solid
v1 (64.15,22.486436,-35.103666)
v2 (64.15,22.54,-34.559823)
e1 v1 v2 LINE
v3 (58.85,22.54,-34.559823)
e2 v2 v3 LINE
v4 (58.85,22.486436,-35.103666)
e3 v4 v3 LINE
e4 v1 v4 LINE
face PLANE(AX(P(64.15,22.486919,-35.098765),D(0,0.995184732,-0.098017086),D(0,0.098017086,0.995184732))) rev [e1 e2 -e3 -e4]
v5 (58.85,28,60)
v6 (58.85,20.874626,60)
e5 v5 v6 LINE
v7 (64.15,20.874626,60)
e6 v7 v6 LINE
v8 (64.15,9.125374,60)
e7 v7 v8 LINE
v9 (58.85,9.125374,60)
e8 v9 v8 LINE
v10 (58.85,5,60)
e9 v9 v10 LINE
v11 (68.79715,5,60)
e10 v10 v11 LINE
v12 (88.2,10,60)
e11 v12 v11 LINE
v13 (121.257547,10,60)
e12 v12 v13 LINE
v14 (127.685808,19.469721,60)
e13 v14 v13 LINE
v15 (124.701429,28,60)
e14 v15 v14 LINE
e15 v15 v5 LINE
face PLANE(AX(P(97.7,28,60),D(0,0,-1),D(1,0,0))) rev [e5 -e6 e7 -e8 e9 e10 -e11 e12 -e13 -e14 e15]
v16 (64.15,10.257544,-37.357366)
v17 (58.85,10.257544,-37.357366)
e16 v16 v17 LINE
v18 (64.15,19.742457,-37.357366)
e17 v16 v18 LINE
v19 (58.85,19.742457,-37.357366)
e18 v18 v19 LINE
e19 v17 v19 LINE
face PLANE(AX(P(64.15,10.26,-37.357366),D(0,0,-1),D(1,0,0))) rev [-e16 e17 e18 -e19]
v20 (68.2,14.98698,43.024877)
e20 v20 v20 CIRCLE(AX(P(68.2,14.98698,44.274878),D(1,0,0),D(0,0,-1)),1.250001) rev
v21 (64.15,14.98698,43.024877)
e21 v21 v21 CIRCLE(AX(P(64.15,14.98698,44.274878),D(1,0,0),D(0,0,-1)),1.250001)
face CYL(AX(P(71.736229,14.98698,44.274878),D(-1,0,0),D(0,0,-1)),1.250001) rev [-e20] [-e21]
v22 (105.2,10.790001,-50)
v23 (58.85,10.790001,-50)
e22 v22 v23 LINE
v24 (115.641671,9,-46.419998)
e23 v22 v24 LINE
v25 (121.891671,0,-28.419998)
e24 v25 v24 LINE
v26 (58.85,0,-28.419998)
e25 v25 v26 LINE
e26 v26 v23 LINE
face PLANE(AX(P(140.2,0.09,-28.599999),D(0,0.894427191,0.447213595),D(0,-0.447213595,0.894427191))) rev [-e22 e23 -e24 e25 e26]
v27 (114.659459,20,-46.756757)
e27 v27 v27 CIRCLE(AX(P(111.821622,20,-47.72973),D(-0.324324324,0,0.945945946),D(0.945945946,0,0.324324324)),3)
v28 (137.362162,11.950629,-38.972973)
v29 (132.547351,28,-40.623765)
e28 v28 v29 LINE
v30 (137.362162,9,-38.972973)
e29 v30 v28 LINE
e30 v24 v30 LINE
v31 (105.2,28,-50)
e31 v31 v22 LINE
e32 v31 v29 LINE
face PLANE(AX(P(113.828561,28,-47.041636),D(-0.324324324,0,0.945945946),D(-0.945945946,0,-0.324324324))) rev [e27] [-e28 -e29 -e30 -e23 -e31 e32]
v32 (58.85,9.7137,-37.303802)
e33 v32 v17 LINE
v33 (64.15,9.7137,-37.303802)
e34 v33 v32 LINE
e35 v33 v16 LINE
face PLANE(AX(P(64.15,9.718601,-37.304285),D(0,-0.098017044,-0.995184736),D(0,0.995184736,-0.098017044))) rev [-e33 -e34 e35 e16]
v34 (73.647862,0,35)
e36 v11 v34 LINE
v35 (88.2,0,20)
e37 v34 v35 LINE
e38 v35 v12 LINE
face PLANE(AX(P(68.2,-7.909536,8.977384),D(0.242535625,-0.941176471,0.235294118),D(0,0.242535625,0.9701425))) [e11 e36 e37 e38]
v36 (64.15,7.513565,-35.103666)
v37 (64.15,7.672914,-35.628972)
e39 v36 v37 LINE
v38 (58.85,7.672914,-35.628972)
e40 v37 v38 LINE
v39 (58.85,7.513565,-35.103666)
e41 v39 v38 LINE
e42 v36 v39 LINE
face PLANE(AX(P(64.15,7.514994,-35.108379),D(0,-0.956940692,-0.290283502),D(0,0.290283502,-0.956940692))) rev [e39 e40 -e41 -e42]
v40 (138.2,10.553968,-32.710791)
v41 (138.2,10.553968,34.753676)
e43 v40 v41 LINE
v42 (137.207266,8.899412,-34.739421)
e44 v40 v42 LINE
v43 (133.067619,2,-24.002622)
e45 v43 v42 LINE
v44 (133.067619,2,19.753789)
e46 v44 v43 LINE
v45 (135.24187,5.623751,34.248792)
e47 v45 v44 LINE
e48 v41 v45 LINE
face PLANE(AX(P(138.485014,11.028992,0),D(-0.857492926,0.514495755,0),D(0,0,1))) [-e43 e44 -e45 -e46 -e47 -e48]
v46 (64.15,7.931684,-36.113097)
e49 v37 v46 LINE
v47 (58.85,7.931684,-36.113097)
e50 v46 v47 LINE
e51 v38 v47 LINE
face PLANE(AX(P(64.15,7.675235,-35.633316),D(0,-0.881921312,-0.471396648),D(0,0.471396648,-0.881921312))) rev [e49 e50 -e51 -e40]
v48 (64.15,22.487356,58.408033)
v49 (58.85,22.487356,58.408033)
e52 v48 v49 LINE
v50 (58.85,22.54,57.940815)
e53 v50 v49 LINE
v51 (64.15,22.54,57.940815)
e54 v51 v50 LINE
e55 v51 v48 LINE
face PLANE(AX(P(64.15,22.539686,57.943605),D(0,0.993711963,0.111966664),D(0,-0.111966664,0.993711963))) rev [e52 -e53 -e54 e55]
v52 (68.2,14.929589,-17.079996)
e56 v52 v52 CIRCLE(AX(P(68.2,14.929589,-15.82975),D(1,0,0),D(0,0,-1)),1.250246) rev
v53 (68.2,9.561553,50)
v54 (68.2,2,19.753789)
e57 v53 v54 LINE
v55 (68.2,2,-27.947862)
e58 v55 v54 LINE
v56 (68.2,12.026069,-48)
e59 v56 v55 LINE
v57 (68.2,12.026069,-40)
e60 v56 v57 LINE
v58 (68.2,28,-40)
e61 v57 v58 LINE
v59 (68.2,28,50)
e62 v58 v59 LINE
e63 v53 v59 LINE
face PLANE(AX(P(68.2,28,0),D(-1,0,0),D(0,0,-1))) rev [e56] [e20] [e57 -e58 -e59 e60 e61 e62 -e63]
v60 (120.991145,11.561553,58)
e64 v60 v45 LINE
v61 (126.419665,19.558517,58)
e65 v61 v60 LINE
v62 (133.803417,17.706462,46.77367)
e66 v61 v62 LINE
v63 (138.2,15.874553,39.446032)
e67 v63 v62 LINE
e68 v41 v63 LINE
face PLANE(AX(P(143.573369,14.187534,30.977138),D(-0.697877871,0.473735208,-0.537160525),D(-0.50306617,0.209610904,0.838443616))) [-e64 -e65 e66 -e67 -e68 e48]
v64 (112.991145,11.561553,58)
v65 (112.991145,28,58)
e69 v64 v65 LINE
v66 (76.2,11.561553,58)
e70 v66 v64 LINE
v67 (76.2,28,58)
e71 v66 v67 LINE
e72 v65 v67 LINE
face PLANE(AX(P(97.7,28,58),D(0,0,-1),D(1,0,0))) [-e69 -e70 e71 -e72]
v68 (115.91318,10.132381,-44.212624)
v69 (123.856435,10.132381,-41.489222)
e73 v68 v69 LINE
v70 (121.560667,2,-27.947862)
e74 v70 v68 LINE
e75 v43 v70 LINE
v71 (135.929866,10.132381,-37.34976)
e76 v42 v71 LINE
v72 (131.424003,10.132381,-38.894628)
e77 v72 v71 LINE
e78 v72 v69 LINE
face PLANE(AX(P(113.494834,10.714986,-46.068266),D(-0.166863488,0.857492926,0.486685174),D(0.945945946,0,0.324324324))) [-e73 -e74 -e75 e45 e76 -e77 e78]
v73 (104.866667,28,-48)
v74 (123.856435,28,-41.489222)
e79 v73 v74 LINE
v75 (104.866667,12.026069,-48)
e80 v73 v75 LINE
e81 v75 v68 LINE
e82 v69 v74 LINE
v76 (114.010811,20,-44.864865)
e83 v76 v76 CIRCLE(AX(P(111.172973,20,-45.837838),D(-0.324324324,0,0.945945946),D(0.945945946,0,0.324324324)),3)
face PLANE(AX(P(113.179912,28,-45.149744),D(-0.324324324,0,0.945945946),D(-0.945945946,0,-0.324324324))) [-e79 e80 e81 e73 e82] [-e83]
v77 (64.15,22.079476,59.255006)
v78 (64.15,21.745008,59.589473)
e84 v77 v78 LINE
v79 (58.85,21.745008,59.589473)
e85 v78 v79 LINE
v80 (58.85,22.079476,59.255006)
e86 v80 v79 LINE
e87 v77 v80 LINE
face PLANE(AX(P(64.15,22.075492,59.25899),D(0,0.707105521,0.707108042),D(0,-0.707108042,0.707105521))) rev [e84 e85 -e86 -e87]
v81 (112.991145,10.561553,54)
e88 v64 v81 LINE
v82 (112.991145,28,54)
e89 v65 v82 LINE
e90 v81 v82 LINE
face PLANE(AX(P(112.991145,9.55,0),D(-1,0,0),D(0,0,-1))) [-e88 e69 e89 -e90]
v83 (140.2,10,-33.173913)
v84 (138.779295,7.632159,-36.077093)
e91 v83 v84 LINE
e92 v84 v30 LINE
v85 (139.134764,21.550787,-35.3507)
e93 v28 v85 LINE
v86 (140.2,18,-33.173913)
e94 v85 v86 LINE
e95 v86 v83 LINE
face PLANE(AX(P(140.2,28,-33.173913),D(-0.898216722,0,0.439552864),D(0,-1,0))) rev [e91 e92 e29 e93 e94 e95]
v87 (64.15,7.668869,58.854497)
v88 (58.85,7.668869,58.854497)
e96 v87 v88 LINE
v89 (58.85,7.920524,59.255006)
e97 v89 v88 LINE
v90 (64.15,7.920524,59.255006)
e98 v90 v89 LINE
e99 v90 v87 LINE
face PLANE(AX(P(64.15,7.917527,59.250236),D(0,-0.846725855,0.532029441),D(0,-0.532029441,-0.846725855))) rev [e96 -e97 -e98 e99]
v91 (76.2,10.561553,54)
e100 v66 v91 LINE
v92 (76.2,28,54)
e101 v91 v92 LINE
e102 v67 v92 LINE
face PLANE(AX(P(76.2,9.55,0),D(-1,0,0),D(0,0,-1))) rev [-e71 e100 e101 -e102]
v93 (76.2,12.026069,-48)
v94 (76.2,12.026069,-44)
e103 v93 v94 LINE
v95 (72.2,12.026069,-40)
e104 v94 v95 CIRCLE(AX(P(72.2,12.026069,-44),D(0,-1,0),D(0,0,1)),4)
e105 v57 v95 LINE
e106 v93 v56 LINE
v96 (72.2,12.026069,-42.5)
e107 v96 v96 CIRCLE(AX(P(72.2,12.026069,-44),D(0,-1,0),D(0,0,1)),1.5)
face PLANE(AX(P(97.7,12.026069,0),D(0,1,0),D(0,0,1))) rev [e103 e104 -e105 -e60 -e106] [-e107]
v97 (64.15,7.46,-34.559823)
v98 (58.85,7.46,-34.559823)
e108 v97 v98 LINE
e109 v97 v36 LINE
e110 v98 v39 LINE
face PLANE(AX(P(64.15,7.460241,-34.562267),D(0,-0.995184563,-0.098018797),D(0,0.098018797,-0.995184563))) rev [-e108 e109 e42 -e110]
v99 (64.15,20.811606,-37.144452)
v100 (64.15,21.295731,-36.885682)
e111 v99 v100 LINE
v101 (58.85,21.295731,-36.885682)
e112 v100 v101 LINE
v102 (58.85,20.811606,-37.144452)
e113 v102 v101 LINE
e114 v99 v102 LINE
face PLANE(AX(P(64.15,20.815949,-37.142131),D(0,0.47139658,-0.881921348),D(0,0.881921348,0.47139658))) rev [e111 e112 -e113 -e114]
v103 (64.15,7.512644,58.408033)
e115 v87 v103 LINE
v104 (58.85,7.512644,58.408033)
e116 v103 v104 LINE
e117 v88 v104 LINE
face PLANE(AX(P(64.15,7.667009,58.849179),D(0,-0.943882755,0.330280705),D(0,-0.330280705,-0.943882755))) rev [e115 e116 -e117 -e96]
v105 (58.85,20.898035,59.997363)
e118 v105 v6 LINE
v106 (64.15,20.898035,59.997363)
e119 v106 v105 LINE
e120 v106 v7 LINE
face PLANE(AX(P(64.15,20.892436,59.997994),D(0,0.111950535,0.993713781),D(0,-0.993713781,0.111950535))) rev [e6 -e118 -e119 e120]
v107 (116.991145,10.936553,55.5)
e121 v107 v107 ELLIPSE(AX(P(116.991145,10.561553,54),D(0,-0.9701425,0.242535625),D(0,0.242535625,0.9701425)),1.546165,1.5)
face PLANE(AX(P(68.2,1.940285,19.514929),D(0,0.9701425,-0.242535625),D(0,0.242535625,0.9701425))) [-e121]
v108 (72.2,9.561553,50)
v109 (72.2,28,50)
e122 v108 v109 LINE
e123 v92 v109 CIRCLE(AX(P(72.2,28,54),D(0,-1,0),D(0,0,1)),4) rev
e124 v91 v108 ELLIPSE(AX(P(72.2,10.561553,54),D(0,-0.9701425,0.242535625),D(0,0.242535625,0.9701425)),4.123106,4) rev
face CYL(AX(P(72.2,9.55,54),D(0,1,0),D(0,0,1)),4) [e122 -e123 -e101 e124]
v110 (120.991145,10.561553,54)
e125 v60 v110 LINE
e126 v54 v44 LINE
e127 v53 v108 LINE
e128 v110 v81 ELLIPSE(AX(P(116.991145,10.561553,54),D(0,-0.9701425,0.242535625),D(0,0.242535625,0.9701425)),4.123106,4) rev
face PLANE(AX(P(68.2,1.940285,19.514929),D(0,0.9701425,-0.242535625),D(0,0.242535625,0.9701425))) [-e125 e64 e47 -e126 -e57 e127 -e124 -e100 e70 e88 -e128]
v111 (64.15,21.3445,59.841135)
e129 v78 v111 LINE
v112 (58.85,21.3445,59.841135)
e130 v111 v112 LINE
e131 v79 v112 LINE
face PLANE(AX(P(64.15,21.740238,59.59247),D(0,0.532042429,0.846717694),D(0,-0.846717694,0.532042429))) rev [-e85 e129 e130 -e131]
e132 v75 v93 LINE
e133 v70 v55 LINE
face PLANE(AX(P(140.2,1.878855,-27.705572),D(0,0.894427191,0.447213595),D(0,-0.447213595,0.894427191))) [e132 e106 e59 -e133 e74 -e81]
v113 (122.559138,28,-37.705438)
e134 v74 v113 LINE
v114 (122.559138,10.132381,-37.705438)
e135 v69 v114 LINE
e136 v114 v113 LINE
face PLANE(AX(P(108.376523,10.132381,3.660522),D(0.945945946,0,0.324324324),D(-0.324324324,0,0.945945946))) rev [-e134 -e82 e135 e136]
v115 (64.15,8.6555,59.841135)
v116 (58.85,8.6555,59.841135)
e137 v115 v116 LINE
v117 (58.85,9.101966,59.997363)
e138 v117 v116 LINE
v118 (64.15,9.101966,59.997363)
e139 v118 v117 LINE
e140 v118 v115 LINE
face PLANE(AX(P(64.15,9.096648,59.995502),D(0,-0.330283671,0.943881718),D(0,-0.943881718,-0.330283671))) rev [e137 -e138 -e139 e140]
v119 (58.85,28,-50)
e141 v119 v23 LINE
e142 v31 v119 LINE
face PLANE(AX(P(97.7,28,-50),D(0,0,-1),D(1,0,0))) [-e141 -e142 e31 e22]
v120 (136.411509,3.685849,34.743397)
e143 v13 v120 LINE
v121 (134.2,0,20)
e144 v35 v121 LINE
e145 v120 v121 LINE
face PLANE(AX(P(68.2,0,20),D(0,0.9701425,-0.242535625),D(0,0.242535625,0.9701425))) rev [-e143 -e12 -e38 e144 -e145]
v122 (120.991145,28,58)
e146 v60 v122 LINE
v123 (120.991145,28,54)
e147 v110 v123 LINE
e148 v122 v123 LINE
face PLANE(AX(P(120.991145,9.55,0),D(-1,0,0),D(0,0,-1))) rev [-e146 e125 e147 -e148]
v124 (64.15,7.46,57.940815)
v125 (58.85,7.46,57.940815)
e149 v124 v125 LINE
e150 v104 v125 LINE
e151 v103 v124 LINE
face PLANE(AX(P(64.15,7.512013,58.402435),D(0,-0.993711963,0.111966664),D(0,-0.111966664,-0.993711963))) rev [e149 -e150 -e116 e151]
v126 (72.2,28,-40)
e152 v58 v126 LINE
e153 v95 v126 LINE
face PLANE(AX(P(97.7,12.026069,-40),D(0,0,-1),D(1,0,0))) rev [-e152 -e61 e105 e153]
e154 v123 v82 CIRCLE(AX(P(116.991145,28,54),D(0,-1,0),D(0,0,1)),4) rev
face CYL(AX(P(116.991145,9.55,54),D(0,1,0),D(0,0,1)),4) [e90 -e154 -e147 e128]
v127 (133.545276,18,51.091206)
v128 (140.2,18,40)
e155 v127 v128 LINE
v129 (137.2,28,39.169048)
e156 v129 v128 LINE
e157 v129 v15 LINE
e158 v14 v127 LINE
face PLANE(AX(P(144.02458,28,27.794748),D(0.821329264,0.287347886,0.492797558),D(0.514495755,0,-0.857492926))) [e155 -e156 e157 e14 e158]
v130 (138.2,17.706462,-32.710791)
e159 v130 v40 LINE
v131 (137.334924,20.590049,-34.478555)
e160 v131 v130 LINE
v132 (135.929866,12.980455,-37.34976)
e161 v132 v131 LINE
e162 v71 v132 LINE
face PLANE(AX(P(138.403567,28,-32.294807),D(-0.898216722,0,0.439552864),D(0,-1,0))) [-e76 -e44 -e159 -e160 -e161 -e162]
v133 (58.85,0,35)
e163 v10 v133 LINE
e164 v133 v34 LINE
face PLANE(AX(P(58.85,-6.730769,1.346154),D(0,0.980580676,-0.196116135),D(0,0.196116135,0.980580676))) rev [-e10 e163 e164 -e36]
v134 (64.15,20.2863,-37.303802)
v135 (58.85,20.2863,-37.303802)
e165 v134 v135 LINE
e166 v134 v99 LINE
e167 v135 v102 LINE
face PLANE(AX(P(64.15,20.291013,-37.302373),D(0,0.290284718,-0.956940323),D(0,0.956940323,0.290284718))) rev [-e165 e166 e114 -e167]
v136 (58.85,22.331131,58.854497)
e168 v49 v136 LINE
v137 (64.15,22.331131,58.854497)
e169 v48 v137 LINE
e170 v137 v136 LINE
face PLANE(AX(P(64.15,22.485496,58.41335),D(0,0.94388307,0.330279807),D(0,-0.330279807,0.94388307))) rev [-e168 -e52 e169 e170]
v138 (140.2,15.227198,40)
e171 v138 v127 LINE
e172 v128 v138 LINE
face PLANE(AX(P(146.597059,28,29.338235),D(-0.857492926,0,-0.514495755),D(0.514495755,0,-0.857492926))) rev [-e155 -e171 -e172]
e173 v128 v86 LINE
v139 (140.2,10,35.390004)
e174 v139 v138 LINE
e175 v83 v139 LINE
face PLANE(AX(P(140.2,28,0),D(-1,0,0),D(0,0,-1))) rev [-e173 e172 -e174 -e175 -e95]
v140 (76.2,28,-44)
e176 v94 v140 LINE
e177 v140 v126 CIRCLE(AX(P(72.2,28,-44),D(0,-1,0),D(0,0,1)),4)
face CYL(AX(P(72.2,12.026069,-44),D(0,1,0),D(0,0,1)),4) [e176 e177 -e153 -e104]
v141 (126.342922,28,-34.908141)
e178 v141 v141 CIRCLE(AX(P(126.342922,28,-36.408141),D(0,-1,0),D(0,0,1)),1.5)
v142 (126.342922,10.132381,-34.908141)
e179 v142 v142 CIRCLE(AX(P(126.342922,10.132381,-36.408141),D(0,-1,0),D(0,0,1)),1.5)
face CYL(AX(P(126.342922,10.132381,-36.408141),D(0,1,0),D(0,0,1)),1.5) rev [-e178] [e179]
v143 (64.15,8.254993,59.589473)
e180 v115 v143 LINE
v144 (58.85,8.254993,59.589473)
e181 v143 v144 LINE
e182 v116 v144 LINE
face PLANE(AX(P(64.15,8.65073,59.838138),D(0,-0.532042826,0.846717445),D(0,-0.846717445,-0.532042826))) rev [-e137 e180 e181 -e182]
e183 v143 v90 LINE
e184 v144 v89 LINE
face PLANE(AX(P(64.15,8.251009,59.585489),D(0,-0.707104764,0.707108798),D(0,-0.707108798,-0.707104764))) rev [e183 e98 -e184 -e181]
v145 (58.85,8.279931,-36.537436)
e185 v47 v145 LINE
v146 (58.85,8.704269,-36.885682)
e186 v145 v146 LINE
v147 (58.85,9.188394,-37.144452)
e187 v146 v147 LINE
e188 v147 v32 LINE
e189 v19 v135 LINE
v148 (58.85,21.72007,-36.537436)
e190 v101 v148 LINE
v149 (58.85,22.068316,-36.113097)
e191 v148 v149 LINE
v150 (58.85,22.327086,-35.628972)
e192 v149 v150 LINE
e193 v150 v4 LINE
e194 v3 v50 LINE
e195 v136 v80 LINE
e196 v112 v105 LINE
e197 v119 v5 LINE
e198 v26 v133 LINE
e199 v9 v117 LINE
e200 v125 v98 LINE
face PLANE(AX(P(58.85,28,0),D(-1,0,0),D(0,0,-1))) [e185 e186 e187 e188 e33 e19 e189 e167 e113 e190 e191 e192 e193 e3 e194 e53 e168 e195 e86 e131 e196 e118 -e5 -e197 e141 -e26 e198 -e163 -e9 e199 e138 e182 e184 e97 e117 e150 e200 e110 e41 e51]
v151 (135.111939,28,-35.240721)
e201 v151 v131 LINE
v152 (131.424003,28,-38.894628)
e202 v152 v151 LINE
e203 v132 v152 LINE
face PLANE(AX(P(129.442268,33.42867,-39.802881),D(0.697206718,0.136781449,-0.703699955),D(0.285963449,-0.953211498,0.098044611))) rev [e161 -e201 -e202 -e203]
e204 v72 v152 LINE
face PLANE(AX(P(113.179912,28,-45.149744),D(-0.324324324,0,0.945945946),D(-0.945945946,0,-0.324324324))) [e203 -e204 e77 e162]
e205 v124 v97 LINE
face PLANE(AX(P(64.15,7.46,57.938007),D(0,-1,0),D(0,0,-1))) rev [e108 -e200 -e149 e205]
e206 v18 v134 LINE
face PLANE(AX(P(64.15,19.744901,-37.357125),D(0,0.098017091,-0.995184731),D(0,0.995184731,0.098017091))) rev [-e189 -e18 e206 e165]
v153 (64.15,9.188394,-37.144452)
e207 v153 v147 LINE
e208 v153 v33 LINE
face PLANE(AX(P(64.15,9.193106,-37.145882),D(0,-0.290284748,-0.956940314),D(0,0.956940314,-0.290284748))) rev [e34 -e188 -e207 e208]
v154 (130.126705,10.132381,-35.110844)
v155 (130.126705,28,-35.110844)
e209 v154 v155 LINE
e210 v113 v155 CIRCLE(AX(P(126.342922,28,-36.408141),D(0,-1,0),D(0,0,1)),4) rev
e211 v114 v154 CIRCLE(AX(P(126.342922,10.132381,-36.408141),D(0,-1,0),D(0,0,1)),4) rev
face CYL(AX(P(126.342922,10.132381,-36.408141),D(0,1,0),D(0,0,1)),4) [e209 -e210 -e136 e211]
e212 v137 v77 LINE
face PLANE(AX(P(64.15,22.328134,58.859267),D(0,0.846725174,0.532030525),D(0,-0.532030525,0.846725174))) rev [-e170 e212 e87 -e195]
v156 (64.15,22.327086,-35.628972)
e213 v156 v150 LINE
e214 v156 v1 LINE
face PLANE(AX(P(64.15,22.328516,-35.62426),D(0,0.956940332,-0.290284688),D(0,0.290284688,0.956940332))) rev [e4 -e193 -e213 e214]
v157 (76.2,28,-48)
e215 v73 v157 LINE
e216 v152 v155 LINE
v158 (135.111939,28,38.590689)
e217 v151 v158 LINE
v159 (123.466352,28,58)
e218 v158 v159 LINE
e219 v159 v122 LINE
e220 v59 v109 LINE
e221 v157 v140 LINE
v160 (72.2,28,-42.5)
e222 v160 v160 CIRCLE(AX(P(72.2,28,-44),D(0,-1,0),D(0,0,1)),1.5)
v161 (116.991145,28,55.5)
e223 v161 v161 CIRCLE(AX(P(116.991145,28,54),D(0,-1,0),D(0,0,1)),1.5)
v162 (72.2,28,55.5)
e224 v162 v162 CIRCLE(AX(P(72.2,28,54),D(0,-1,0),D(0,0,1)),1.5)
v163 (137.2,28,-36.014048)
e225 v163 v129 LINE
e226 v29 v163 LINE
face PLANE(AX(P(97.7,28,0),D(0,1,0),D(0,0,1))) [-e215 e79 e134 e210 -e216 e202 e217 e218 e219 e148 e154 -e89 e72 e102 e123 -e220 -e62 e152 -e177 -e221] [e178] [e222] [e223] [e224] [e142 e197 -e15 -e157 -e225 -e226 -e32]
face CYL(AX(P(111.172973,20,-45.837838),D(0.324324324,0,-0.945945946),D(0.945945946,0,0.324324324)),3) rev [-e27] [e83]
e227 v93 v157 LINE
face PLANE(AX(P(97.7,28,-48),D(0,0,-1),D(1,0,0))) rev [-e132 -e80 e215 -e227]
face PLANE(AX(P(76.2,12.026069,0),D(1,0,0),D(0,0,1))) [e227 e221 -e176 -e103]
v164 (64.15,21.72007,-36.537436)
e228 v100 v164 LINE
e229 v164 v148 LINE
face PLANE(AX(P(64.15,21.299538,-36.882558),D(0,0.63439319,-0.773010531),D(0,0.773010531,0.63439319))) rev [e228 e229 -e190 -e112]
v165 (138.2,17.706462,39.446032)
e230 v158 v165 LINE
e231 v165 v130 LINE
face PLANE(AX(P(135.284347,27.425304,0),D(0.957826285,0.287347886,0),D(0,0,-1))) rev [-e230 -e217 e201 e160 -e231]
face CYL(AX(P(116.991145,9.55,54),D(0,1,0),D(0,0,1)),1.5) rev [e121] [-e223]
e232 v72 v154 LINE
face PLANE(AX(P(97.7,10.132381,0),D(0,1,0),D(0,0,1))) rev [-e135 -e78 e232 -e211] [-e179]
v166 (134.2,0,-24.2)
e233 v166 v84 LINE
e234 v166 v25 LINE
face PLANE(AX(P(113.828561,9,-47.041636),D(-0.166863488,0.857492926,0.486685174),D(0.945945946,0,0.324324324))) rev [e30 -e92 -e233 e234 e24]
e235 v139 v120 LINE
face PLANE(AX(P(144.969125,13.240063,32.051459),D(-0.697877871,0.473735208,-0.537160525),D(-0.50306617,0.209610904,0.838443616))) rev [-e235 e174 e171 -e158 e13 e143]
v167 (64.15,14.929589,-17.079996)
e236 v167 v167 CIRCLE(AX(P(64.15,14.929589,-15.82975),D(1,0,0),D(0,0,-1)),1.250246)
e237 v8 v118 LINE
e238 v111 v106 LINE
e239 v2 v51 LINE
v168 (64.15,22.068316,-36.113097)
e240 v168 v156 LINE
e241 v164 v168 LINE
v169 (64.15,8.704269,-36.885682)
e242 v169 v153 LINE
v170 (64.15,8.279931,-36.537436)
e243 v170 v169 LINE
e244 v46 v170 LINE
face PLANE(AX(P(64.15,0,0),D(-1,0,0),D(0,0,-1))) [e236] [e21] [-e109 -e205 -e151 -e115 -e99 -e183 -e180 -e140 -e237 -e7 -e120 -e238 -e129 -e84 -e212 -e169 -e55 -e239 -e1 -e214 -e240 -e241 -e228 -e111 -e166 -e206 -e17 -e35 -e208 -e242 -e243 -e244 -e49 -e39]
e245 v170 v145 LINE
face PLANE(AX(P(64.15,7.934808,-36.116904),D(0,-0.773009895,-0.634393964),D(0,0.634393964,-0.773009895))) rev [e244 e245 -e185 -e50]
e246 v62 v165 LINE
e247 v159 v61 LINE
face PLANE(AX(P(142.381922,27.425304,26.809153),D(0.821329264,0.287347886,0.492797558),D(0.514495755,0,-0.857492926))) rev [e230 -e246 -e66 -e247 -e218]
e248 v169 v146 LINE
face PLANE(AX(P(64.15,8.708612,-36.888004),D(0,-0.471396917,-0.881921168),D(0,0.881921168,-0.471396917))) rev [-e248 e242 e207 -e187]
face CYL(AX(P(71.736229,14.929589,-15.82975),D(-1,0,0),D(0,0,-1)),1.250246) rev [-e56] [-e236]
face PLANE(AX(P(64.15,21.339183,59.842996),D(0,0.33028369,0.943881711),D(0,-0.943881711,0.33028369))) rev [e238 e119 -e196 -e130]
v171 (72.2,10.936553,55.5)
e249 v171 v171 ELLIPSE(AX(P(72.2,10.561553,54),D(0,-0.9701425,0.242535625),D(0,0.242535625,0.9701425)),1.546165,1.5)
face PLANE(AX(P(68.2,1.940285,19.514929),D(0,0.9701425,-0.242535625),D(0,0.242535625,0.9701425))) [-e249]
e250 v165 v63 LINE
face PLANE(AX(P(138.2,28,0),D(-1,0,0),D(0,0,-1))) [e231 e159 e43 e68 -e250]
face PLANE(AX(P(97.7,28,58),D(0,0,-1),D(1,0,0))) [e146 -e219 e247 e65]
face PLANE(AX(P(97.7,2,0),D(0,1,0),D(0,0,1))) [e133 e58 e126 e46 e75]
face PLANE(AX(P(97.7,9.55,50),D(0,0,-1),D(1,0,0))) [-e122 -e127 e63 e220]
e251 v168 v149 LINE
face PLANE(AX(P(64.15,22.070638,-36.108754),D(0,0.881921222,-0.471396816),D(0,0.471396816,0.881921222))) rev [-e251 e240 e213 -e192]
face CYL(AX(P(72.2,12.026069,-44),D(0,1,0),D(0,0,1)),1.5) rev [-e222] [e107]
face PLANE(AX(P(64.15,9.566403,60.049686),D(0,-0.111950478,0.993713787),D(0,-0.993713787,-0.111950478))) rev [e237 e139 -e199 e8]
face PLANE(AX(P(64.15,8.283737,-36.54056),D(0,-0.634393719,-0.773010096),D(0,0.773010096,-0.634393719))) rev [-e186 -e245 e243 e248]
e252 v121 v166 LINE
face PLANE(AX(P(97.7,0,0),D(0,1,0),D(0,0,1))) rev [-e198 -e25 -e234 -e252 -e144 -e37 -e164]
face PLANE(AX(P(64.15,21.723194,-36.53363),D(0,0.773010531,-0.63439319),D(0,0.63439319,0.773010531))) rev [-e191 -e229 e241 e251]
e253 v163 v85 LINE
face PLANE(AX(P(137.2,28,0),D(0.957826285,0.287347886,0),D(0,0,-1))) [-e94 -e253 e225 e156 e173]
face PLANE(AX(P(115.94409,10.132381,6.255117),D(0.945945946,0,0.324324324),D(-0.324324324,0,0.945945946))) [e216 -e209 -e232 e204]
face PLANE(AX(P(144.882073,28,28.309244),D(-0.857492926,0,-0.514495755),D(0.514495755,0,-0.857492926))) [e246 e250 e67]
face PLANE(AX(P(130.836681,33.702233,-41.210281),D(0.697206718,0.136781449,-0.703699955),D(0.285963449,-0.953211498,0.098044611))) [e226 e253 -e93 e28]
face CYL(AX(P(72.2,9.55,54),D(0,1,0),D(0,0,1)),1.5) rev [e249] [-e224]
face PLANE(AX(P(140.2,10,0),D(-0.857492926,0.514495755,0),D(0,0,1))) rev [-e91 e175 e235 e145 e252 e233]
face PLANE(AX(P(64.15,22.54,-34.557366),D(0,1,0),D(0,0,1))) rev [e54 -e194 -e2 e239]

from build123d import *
from OCP.BRepFilletAPI import BRepFilletAPI_MakeChamfer

# Parameters (mm, degrees)
SKETCH1_W               = 55
SKETCH1_H               = 60
BOSS_EXTRUDE1_DEPTH     = 28
CHAMFER5_SIZE           = 15
CHAMFER5_SIZE2          = 9
CUT_EXTRUDE3_DEPTH      = 98.816154085
CUT_EXTRUDE5_DEPTH      = 98.816154085
CHAMFER2_SIZE           = 6
CHAMFER2_SIZE2          = 10
CHAMFER2_PART_2_SIZE    = 6
CHAMFER2_PART_2_SIZE2   = 10
CHAMFER3_SIZE           = 10
CHAMFER3_SIZE2          = 3
CHAMFER8_SIZE           = 3
CHAMFER8_SIZE2          = 4.688384964
CHAMFER8_SIZE2_2        = 4.826086957
SHELL1_T                = -2
SKETCH1_3_W             = 9.35
SKETCH1_3_H             = 100
SKETCH1_3_H_2           = 10
BOSS_EXTRUDE2_DEPTH     = 28
CUT_EXTRUDE1_DEPTH      = 5.3
CUT_EXTRUDE_THIN1_DEPTH = 5.3
SKETCH4_R               = 1.250001298
SKETCH4_R_2             = 1.250245712
CUT_EXTRUDE2_DEPTH      = 4.05
CUT_EXTRUDE4_DEPTH      = 9.35
CUT_EXTRUDE6_DEPTH      = 98.816154085
CHAMFER6_SIZE           = 20
CHAMFER6_SIZE_2         = 5
SKETCH10_R              = 3
CUT_EXTRUDE7_DEPTH      = 2
SKETCH12_R              = 1.5
BOSS_EXTRUDE3_DEPTH     = 18.45
SKETCH12_4_R            = 1.5
BOSS_EXTRUDE4_DEPTH     = 15.973931
SKETCH12_5_R            = 1.5
BOSS_EXTRUDE5_DEPTH     = 17.86762


with BuildPart() as part:
    # Sketch1 → Boss-Extrude1 (new body)
    # profile 1 of 2: a face of its own
    with BuildSketch(Plane(origin=(0, 0, 0), x_dir=(1, 0, 0), z_dir=(0, 1, 0))):
        Polygon((29.5, 50), (-7.5, 50), (-42.5, 38), (-42.5, -40), (-30.5, -60), (29.5, -60), (29.5, -50), align=None)
        Rectangle(SKETCH1_W, SKETCH1_H, mode=Mode.SUBTRACT)
    # profile 2 of 2: a face of its own
    with BuildSketch(Plane(origin=(0, 0, 0), x_dir=(1, 0, 0), z_dir=(0, 1, 0))):
        Rectangle(SKETCH1_W, SKETCH1_H)
    extrude(amount=BOSS_EXTRUDE1_DEPTH)

    # Chamfer5
    chamfer5_edges = [part.edges().sort_by_distance(p)[0] for p in [
        (-25, 0, -44),
    ]]
    chamfer5_side = [part.faces().sort_by_distance(p)[0] for p in [
        (-5.320816864, 0, 5.646903821),
    ]]
    chamfer(chamfer5_edges, length=CHAMFER5_SIZE, length2=CHAMFER5_SIZE2, reference=chamfer5_side[0])

    # Sketch6 → Cut-Extrude3 (cut, through all)
    with BuildSketch(Plane(origin=(29.5, 0, 0), x_dir=(0, 0, -1), z_dir=(1, 0, 0))):
        Polygon((28.599998808, 0.090000199), (38.599998808, 5.090000199), (50, 10.790000795), (50, 0), (28.41999841, 0), align=None)
    extrude(amount=-CUT_EXTRUDE3_DEPTH, mode=Mode.SUBTRACT)

    # Sketch8 → Cut-Extrude5 (cut, through all)
    with BuildSketch(Plane.ZY.offset(42.5)):
        Polygon((20, 0), (60, 10), (60, 0), align=None)
    extrude(amount=-CUT_EXTRUDE5_DEPTH, mode=Mode.SUBTRACT)

    # Chamfer2
    chamfer2_edges = [part.edges().sort_by_distance(p)[0] for p in [
        (-42.5, 0, -1.071428571),
    ]]
    chamfer2_side = [part.faces().sort_by_distance(p)[0] for p in [
        (-5.998960327, 0, -3.839335876),
    ]]
    chamfer(chamfer2_edges, length=CHAMFER2_SIZE, length2=CHAMFER2_SIZE2, reference=chamfer2_side[0])

    # Chamfer2 part 2
    chamfer2_part_2_edges = [part.edges().sort_by_distance(p)[0] for p in [
        (-36.5, 7.5, 50),
    ]]
    chamfer2_part_2_side = [part.faces().sort_by_distance(p)[0] for p in [
        (-5.108695652, 4.855072464, 39.420289855),
    ]]
    chamfer(chamfer2_part_2_edges, length=CHAMFER2_PART_2_SIZE, length2=CHAMFER2_PART_2_SIZE2, reference=chamfer2_part_2_side[0])

    # Chamfer3: one chamfer whose edges measure the first distance from different faces: ONE call of the kernel's chamfer builder (chamfer() names one face for all edges)
    chamfer3_edges_1 = [part.edges().sort_by_distance(p)[0] for p in [
        (-36.5, 28, 50),
    ]]
    chamfer3_side_1 = [part.faces().sort_by_distance(p)[0] for p in [
        (-36.986722145, 22.762198781, 49.188796426),
    ]]
    chamfer3_edges_2 = [part.edges().sort_by_distance(p)[0] for p in [
        (-42.5, 28, 1),
    ]]
    chamfer3_side_2 = [part.faces().sort_by_distance(p)[0] for p in [
        (-42.5, 19.062821539, 0.675718674),
    ]]
    chamfer3 = BRepFilletAPI_MakeChamfer(part.part.solid().wrapped)
    for e in chamfer3_edges_1:
        chamfer3.Add(CHAMFER3_SIZE, CHAMFER3_SIZE2, e.wrapped, chamfer3_side_1[0].wrapped)  # the first distance lies on this face
    for e in chamfer3_edges_2:
        chamfer3.Add(CHAMFER3_SIZE, CHAMFER3_SIZE2, e.wrapped, chamfer3_side_2[0].wrapped)  # the first distance lies on this face
    add(Compound.cast(chamfer3.Shape()), mode=Mode.REPLACE)

    # Chamfer8: one chamfer whose edges measure the first distance from different faces: ONE call of the kernel's chamfer builder (chamfer() names one face for all edges)
    chamfer8_edges_1 = [part.edges().sort_by_distance(p)[0] for p in [
        (-41, 23, -38.514285714),
    ]]
    chamfer8_side_1 = [part.faces().sort_by_distance(p)[0] for p in [
        (-40.999367405, 23.002108649, 0.534923115),
    ]]
    chamfer8_edges_2 = [part.edges().sort_by_distance(p)[0] for p in [
        (-42.5, 14, -38),
    ]]
    chamfer8_side_2 = [part.faces().sort_by_distance(p)[0] for p in [
        (-24.809989525, 18.489778037, -44.065146449),
    ]]
    chamfer8 = BRepFilletAPI_MakeChamfer(part.part.solid().wrapped)
    for e in chamfer8_edges_1:
        chamfer8.Add(CHAMFER8_SIZE, CHAMFER8_SIZE2, e.wrapped, chamfer8_side_1[0].wrapped)  # the first distance lies on this face
    for e in chamfer8_edges_2:
        chamfer8.Add(CHAMFER8_SIZE, CHAMFER8_SIZE2_2, e.wrapped, chamfer8_side_2[0].wrapped)  # the first distance lies on this face
    add(Compound.cast(chamfer8.Shape()), mode=Mode.REPLACE)

    # Shell1
    shell1_openings = [part.faces().sort_by_distance(p)[0] for p in [
        (-3.850715667, 28, 5.420818652),
        (29.5, 15.210219058, 3.998585691),
    ]]
    offset(amount=SHELL1_T, openings=shell1_openings, kind=Kind.INTERSECTION)

    # Sketch1<3> → Boss-Extrude2 (add)
    with BuildSketch(Plane(origin=(0, 0, 0), x_dir=(1, 0, 0), z_dir=(0, 1, 0))):
        with Locations((34.175, 0)):
            Rectangle(SKETCH1_3_W, SKETCH1_3_H)
        with Locations((34.175, -55)):
            Rectangle(SKETCH1_3_W, SKETCH1_3_H_2)
    extrude(amount=BOSS_EXTRUDE2_DEPTH)

    # Sketch3 → Cut-Extrude1 (cut)
    with BuildSketch(Plane(origin=(38.85, 0, 0), x_dir=(0, 0, -1), z_dir=(1, 0, 0))):
        Polygon((34.557366217, 22.490000211), (-57.938007116, 22.490000211), (-58.396836221, 22.438301563), (-58.832665384, 22.285797958), (-59.223634601, 22.040136716), (-59.550133944, 21.713636209), (-59.795801938, 21.322668447), (-59.948307872, 20.886838382), (-60, 20.4280002), (-60, 9.572000334), (-59.948307872, 9.113161916), (-59.795801938, 8.677331822), (-59.550133944, 8.286364468), (-59.223634601, 7.959863262), (-58.832665384, 7.714202719), (-58.396836221, 7.561698647), (-57.938007116, 7.51), (34.557366217, 7.51), (35.093864598, 7.56284138), (35.609745709, 7.719331512), (36.08518437, 7.973458709), (36.501909895, 8.315457123), (36.84390761, 8.732182065), (37.098034807, 9.207620377), (37.254525637, 9.723501371), (37.307366086, 10.259999985), (37.307366086, 19.740000226), (37.254525637, 20.276498578), (37.098034807, 20.79237963), (36.84390761, 21.267818379), (36.501909895, 21.684543903), (36.08518437, 22.026541618), (35.609745709, 22.280668931), (35.093864598, 22.437159762), align=None)
    extrude(amount=-CUT_EXTRUDE1_DEPTH, mode=Mode.SUBTRACT)

    # Sketch3<2> → Cut-Extrude-Thin1 (cut)
    with BuildSketch(Plane(origin=(38.85, 0, 0), x_dir=(0, 0, -1), z_dir=(1, 0, 0))):
        Polygon((-58.408032741, 22.487356385), (-58.854496816, 22.331131453), (-59.255006355, 22.079475653), (-59.589472678, 21.745008138), (-59.84113526, 21.344500303), (-59.997362817, 20.898034618), (-60.05, 20.430807788), (-60.05, 9.569192748), (-59.997362818, 9.101965682), (-59.841135257, 8.655499956), (-59.589472684, 8.254992553), (-59.255006355, 7.920524316), (-58.854496805, 7.668869226), (-58.408032765, 7.512643829), (-57.940815111, 7.46), (34.559822602, 7.46), (35.103666322, 7.513564845), (35.628972433, 7.672914008), (36.113097308, 7.931684081), (36.537436306, 8.279930722), (36.885682237, 8.704269129), (37.144452294, 9.188393617), (37.303802182, 9.713699658), (37.357366086, 10.257543645), (37.357366086, 19.742456567), (37.303802182, 20.286300291), (37.144452297, 20.811606381), (36.885682251, 21.295731292), (36.537436304, 21.720070312), (36.113097289, 22.068316255), (35.628972465, 22.32708642), (35.103666311, 22.486436306), (34.559822559, 22.540000211), (-57.940815111, 22.540000211), align=None)
        Polygon((-58.396836221, 22.438301563), (-58.832665384, 22.285797958), (-59.223634601, 22.040136716), (-59.550133944, 21.713636209), (-59.795801938, 21.322668447), (-59.948307872, 20.886838382), (-60, 20.4280002), (-60, 9.572000334), (-59.948307872, 9.113161916), (-59.795801938, 8.677331822), (-59.550133944, 8.286364468), (-59.223634601, 7.959863262), (-58.832665384, 7.714202719), (-58.396836221, 7.561698647), (-57.938007116, 7.51), (34.557366217, 7.51), (35.093864598, 7.56284138), (35.609745709, 7.719331512), (36.08518437, 7.973458709), (36.501909895, 8.315457123), (36.84390761, 8.732182065), (37.098034807, 9.207620377), (37.254525637, 9.723501371), (37.307366086, 10.259999985), (37.307366086, 19.740000226), (37.254525637, 20.276498578), (37.098034807, 20.79237963), (36.84390761, 21.267818379), (36.501909895, 21.684543903), (36.08518437, 22.026541618), (35.609745709, 22.280668931), (35.093864598, 22.437159762), (34.557366217, 22.490000211), (-57.938007116, 22.490000211), align=None, mode=Mode.SUBTRACT)
    extrude(amount=-CUT_EXTRUDE_THIN1_DEPTH, mode=Mode.SUBTRACT)

    # Sketch4 → Cut-Extrude2 (cut)
    with BuildSketch(Plane(origin=(33.55, 0, 0), x_dir=(0, 0, -1), z_dir=(1, 0, 0))):
        with Locations((-44.274877957, 14.986979658)):
            Circle(SKETCH4_R)
        with Locations((15.829750418, 14.92958888)):
            Circle(SKETCH4_R_2)
    extrude(amount=-CUT_EXTRUDE2_DEPTH, mode=Mode.SUBTRACT)

    # Sketch7 → Cut-Extrude4 (cut)
    with BuildSketch(Plane.ZY.offset(-29.5)):
        Polygon((-28.41999841, 0), (-50, 10.790000795), (-50, 0), align=None)
    extrude(amount=-CUT_EXTRUDE4_DEPTH, mode=Mode.SUBTRACT)

    # Sketch9 → Cut-Extrude6 (cut, through all)
    with BuildSketch(Plane.ZY.offset(-29.5)):
        Polygon((60, 0), (60, 5), (35, 0), align=None)
    extrude(amount=-CUT_EXTRUDE6_DEPTH, mode=Mode.SUBTRACT)

    # Chamfer6
    # the kernel refuses this chamfer: 20, 5 mm, written as the material it adds along each edge
    with BuildSketch(Plane(origin=(29.5, -12.597918829, -30.391675317), x_dir=(-0.9999563942249224, 0.009059783074481399, -0.0022649457686203496), z_dir=(0, 0.24253562503633297, 0.9701425001453319))) as chamfer6_piece_1_section:
        Polygon((CHAMFER6_SIZE * 0.999956394225, CHAMFER6_SIZE * 0.00933861064032), (-CHAMFER6_SIZE_2 * 0.00933861064032, CHAMFER6_SIZE_2 * 0.999956394225), (0, 0), align=None)
    chamfer6_piece_1 = extrude(amount=145.116156247, mode=Mode.PRIVATE)
    chamfer6_piece_1 = split(chamfer6_piece_1, bisect_by=Plane(origin=(21.891274925, 0, 42.504406507), z_dir=(0, 1, 0)), keep=Keep.TOP, mode=Mode.PRIVATE)
    chamfer6_piece_1 = split(chamfer6_piece_1, bisect_by=Plane(origin=(21.891274925, 4.42094487, 60), z_dir=(0, 0, -1)), keep=Keep.TOP, mode=Mode.PRIVATE)
    chamfer6_piece_1 = split(chamfer6_piece_1, bisect_by=Plane(origin=(21.891274925, 1.613191439, 43.065957193), z_dir=(0, 0.9805806756909202, -0.19611613513818396)), keep=Keep.TOP, mode=Mode.PRIVATE)
    add(chamfer6_piece_1)

    # Sketch10 → Cut-Extrude7 (cut)
    with BuildSketch(Plane(origin=(-16.128560993, 0, -47.041636231), x_dir=(-0.9459459459459459, 0, 0.3243243243243241), z_dir=(-0.3243243243243242, 0, -0.945945945945946))):
        with Locations((-2.121621622, 20)):
            Circle(SKETCH10_R)
    extrude(amount=-CUT_EXTRUDE7_DEPTH, mode=Mode.SUBTRACT)

    # Sketch12 → Boss-Extrude3 (add)
    # profile 1 of 2: a face of its own
    with BuildSketch(Plane(origin=(0, 28, 0), x_dir=(1, 0, 0), z_dir=(0, 1, 0))):
        with BuildLine():
            Line((21.5, -58), (29.5, -58))
            Line((29.5, -58), (29.5, -50))
            Line((29.5, -50), (25.5, -50))
            ThreePointArc((25.5, -50), (22.671572875, -51.171572875), (21.5, -54))
            Line((21.5, -54), (21.5, -58))
        make_face()
        with Locations(Location((25.5, -54, 0), (0, 0, 270))):
            Circle(SKETCH12_R, mode=Mode.SUBTRACT)
    # profile 2 of 2: a face of its own
    with BuildSketch(Plane(origin=(0, 28, 0), x_dir=(1, 0, 0), z_dir=(0, 1, 0))):
        with BuildLine():
            Line((-23.291144984, -58), (-15.291144984, -58))
            Line((-15.291144984, -58), (-15.291144984, -54))
            ThreePointArc((-15.291144984, -54), (-19.291144984, -50), (-23.291144984, -54))
            Line((-23.291144984, -54), (-23.291144984, -58))
        make_face()
        with Locations(Location((-19.291144984, -54, 0), (0, 0, 270))):
            Circle(SKETCH12_R, mode=Mode.SUBTRACT)
    extrude(amount=-BOSS_EXTRUDE3_DEPTH)

    # Sketch12<4> → Boss-Extrude4 (add)
    with BuildSketch(Plane(origin=(0, 28, 0), x_dir=(1, 0, 0), z_dir=(0, 1, 0))):
        with BuildLine():
            Line((29.5, 40), (29.5, 48))
            Line((29.5, 48), (21.5, 48))
            Line((21.5, 48), (21.5, 44))
            ThreePointArc((21.5, 44), (22.671572875, 41.171572875), (25.5, 40))
            Line((25.5, 40), (29.5, 40))
        make_face()
        with Locations(Location((25.5, 44, 0), (0, 0, 270))):
            Circle(SKETCH12_4_R, mode=Mode.SUBTRACT)
    extrude(amount=-BOSS_EXTRUDE4_DEPTH)

    # Sketch12<5> → Boss-Extrude5 (add)
    with BuildSketch(Plane(origin=(0, 28, 0), x_dir=(1, 0, 0), z_dir=(0, 1, 0))):
        with BuildLine():
            Line((-26.156435162, 41.48922223), (-33.72400273, 38.894627636))
            Line((-33.72400273, 38.894627636), (-32.426705432, 35.110843852))
            ThreePointArc((-32.426705432, 35.110843852), (-30.401133137, 32.815274277), (-27.34562442, 32.624357342))
            ThreePointArc((-27.34562442, 32.624357342), (-25.050054776, 34.649929661), (-24.859137865, 37.705438446))
            Line((-24.859137865, 37.705438446), (-26.156435162, 41.48922223))
        make_face()
        with Locations(Location((-28.642921649, 36.408141149, 0), (0, 0, 270))):
            Circle(SKETCH12_5_R, mode=Mode.SUBTRACT)
    extrude(amount=-BOSS_EXTRUDE5_DEPTH)


with BuildPart() as body_2:
    # Mirror1: mirrored copy
    add(part.part.mirror(Plane(origin=(48.85, 0, 0), x_dir=(0, 0, 1), z_dir=(1, 0, 0))))


solid = body_2.part
